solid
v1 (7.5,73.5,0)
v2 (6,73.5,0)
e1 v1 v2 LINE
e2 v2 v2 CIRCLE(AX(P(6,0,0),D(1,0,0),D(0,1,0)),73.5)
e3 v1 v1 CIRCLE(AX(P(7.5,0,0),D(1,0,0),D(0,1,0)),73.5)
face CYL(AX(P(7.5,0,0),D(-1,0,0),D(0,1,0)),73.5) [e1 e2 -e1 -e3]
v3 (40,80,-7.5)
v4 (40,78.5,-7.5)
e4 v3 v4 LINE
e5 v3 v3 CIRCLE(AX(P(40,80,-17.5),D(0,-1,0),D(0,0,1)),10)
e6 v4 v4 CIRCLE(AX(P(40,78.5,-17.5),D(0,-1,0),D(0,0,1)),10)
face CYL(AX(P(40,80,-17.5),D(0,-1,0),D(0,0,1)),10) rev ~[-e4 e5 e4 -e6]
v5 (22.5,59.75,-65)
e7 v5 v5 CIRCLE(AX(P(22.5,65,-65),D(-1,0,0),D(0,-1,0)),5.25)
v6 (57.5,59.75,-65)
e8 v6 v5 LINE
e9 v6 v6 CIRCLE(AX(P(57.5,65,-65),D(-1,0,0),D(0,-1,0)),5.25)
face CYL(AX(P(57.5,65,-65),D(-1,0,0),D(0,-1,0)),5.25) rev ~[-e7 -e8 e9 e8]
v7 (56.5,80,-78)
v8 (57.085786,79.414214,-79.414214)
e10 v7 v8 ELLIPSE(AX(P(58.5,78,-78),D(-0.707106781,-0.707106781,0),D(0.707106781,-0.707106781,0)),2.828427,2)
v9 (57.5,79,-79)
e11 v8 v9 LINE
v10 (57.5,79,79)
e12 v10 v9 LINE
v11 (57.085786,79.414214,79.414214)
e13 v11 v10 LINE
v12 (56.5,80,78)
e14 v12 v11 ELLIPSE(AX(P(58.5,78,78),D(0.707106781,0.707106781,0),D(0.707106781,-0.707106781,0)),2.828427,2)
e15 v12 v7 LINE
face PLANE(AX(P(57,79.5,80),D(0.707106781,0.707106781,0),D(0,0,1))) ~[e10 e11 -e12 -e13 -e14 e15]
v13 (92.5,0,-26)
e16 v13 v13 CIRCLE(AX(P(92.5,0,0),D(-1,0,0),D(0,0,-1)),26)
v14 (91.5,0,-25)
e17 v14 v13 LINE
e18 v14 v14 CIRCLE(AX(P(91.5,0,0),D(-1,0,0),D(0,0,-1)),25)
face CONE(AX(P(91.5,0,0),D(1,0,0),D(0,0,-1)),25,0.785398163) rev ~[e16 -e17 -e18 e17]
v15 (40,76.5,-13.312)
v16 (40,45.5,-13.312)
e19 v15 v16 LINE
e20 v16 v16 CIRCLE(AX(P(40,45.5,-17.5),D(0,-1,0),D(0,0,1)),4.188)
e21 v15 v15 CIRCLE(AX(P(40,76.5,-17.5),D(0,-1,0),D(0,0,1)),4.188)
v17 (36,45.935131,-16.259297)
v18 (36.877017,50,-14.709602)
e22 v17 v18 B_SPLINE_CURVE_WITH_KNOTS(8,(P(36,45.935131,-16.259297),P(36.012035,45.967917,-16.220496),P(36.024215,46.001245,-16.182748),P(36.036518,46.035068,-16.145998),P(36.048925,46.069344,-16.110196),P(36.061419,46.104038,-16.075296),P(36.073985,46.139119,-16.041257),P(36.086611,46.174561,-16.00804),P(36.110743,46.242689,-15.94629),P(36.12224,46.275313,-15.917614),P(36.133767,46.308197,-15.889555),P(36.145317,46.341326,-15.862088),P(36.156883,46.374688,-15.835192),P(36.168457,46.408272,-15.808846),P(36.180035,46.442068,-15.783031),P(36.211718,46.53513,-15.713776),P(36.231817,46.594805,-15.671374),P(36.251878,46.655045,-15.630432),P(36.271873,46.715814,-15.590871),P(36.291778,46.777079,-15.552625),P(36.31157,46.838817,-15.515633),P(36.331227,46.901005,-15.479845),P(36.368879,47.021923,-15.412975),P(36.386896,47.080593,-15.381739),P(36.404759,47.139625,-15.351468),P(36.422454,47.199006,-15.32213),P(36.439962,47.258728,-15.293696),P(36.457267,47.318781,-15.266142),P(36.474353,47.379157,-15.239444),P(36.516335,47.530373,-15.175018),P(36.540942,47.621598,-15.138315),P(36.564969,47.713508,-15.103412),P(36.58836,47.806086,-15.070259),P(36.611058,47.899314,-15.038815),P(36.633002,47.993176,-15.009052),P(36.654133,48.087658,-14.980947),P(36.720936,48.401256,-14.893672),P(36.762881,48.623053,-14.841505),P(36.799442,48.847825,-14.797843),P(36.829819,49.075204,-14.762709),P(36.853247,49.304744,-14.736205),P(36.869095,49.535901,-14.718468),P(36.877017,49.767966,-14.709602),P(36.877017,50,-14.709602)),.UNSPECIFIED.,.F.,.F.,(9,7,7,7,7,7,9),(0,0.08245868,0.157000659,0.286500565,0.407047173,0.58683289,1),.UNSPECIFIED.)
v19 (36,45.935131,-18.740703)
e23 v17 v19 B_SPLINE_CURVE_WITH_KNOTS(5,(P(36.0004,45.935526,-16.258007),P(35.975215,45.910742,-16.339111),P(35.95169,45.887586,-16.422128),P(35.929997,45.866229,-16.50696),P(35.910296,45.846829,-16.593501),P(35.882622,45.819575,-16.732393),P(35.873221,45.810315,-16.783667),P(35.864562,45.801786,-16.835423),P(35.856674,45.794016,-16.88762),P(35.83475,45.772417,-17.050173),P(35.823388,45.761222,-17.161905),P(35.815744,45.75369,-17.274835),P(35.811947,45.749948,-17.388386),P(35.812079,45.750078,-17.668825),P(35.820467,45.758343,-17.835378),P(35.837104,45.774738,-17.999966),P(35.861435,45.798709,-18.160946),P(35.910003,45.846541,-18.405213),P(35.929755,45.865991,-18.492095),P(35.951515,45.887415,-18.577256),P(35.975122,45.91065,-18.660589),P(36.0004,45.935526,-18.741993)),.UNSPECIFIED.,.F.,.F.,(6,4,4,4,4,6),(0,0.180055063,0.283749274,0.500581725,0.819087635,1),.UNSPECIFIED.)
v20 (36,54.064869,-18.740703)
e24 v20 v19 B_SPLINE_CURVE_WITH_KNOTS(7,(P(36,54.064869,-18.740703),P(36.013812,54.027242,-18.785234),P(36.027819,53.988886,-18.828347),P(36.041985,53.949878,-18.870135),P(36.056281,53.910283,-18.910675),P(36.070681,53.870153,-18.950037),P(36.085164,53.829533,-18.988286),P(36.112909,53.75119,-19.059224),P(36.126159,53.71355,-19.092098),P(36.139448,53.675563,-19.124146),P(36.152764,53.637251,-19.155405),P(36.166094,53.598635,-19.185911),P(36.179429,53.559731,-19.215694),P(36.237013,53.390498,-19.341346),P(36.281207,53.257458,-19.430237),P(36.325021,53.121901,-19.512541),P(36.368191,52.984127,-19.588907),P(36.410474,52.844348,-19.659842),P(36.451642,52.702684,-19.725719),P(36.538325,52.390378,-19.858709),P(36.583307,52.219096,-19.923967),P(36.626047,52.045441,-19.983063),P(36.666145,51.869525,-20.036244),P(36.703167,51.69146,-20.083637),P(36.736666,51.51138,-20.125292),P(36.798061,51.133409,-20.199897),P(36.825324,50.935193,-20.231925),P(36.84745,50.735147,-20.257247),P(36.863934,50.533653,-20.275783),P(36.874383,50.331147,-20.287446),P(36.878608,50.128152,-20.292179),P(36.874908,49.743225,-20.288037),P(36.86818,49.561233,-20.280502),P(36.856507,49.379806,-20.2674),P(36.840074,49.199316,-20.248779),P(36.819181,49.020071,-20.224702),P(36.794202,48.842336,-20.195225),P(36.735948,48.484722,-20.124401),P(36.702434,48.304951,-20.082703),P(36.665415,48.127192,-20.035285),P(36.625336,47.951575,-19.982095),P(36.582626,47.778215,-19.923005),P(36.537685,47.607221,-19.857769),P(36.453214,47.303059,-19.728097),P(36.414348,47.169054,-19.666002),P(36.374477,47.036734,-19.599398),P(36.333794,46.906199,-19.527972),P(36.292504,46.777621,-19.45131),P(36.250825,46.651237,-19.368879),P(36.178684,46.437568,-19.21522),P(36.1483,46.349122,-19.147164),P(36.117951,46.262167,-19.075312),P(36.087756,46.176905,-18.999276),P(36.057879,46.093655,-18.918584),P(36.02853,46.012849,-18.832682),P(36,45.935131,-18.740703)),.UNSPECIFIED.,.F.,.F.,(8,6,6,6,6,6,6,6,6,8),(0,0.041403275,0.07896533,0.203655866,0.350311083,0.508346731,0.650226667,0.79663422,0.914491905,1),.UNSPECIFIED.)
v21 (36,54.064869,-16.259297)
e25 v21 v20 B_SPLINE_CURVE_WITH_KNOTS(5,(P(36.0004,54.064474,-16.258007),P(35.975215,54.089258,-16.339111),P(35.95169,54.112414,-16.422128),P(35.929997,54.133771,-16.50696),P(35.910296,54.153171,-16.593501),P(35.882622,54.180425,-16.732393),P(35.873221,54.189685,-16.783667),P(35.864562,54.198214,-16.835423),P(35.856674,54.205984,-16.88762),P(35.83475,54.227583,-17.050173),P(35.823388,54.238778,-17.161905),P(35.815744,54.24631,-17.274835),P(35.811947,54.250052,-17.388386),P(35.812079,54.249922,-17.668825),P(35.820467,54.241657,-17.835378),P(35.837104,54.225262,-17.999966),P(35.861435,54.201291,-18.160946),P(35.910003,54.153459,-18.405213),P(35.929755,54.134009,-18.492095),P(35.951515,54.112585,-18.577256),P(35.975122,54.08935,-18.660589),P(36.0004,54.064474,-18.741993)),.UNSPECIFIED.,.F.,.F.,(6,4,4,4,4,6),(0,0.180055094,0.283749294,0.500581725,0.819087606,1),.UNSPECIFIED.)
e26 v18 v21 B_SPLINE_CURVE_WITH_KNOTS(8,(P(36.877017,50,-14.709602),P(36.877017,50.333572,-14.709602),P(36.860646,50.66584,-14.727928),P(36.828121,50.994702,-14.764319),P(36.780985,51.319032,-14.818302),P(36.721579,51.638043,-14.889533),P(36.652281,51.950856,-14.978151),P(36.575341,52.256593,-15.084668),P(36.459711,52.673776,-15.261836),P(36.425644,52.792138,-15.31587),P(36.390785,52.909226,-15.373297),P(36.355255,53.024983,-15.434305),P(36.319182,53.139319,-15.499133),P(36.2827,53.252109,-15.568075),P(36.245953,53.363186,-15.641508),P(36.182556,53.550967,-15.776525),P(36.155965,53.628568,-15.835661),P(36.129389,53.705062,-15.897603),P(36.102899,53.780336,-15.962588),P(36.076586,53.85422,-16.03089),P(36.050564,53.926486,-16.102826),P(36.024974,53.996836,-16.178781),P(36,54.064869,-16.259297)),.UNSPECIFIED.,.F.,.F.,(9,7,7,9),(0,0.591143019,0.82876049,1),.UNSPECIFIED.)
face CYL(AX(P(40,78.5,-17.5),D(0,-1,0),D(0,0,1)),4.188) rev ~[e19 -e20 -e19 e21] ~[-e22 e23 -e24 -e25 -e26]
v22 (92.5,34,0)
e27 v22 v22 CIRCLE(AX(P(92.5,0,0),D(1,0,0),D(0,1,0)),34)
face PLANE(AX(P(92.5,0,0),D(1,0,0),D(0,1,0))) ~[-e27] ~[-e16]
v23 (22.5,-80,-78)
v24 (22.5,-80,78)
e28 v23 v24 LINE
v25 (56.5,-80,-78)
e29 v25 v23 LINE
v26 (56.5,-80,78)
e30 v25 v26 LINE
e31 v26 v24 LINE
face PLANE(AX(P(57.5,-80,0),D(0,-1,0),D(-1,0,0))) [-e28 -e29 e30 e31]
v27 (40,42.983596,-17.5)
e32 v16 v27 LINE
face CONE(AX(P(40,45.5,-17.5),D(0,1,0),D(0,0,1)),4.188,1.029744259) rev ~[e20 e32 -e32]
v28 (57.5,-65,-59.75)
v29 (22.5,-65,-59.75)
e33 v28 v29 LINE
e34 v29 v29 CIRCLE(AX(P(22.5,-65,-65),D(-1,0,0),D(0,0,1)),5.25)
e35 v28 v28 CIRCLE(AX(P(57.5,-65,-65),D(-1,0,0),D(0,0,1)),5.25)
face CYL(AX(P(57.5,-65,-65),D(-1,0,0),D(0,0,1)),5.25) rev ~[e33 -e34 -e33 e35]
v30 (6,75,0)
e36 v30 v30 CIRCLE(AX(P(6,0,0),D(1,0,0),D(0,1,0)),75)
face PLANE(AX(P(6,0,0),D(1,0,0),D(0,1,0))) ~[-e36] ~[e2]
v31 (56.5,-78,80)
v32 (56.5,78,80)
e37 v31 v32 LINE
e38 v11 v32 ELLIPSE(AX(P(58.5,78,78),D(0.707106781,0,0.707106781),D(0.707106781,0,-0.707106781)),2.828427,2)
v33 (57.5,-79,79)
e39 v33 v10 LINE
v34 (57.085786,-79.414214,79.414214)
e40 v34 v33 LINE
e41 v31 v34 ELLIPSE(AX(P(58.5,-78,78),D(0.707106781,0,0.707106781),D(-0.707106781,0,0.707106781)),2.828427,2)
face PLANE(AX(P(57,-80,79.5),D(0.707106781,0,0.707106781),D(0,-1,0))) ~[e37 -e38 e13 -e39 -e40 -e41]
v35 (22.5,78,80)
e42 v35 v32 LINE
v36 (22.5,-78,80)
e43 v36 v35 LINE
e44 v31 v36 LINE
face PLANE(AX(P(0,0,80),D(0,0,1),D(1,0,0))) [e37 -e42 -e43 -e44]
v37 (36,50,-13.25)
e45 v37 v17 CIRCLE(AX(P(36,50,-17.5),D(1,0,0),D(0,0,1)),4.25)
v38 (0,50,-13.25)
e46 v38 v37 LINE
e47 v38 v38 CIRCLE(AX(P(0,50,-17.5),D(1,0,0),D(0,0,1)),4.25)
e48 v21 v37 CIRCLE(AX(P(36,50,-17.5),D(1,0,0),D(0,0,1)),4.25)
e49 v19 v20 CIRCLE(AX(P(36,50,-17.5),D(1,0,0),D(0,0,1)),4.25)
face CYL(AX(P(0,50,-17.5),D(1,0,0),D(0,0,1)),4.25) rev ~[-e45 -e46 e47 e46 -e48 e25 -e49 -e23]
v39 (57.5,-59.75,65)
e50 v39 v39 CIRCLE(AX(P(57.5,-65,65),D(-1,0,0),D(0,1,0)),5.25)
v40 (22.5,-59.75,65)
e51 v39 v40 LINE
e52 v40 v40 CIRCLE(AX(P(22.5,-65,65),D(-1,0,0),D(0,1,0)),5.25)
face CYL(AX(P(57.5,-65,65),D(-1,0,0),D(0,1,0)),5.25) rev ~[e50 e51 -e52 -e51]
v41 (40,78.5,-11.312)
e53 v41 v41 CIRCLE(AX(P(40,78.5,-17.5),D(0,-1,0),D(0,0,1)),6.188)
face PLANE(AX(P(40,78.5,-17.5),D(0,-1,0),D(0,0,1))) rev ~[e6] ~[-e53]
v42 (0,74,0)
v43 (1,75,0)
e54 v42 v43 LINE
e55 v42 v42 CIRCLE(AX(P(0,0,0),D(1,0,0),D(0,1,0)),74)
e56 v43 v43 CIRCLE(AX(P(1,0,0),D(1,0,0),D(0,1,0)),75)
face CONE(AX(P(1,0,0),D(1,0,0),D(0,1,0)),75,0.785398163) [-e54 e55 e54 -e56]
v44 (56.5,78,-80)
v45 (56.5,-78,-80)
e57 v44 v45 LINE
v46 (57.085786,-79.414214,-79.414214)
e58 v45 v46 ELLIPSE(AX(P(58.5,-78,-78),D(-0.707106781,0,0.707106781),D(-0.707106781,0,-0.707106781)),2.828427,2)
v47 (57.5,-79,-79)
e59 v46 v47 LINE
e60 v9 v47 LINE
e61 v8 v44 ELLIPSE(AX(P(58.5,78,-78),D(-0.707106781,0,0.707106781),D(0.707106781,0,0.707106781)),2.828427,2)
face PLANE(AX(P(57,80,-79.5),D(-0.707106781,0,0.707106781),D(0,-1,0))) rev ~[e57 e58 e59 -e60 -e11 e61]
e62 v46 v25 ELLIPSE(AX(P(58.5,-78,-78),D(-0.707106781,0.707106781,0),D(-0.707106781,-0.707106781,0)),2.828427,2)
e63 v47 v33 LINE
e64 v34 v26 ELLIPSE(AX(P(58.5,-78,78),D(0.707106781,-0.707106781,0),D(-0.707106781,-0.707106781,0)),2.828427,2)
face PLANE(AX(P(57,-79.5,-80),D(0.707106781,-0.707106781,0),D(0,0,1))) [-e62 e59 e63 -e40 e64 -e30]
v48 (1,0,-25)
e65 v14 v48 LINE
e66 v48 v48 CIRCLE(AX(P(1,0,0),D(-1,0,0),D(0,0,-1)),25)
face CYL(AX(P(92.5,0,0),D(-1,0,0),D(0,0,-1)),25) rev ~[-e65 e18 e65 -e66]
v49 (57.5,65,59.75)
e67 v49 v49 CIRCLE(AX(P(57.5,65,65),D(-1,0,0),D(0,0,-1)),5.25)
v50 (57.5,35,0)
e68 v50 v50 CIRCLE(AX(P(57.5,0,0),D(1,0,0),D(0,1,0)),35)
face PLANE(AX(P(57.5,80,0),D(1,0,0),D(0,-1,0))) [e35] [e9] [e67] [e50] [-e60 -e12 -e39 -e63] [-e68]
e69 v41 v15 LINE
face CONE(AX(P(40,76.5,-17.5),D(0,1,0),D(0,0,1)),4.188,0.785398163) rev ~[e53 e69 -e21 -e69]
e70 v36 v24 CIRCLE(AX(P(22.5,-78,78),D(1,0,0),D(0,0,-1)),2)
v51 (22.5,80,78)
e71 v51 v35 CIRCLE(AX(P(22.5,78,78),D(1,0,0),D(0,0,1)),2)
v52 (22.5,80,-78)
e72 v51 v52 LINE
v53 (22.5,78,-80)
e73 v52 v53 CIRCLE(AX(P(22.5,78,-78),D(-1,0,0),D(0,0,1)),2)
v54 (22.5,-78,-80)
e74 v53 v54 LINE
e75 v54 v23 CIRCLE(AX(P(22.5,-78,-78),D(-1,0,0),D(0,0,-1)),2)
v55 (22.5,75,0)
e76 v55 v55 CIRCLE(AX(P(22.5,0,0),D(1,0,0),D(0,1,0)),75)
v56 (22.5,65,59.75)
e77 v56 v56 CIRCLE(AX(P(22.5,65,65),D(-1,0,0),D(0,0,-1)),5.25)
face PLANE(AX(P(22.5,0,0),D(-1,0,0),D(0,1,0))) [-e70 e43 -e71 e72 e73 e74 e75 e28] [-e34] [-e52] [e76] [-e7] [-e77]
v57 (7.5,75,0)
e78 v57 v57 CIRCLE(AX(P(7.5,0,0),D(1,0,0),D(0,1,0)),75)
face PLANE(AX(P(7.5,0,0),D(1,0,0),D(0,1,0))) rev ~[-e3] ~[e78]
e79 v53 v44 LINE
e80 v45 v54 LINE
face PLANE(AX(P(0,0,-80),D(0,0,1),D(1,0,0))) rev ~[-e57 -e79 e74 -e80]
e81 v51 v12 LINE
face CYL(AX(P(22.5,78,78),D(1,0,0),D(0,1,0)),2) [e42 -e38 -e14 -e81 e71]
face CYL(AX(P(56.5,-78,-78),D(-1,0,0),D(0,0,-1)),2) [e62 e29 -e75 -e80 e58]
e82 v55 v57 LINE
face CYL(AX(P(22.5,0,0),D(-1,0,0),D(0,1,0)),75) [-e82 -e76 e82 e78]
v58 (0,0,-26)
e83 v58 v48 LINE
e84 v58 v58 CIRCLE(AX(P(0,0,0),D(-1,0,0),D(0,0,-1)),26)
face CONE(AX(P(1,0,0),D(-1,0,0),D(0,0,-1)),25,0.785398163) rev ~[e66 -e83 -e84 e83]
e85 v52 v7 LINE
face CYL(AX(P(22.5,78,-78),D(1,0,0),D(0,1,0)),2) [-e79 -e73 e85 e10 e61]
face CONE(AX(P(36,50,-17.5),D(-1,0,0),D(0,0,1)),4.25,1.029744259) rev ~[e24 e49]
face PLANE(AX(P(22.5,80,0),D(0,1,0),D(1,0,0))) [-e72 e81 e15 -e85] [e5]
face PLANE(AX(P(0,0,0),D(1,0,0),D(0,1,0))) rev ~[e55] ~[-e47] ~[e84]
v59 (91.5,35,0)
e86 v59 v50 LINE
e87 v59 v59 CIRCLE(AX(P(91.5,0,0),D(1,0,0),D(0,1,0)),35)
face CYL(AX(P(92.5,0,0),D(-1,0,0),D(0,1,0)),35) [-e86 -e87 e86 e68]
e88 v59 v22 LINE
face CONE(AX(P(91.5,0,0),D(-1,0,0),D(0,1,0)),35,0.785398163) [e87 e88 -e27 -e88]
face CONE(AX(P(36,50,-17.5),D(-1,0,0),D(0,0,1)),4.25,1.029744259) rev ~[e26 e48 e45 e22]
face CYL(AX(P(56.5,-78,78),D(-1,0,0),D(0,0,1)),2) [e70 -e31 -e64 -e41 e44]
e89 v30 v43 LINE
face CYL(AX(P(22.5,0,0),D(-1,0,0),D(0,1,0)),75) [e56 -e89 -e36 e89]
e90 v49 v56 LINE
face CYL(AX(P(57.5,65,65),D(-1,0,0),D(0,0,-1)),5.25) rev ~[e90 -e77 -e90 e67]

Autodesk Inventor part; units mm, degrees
ref_plane "YZ Plane" through (0, 0, 0) normal (1, 0, 0) x (0, 1, 0)
ref_plane "XZ Plane" through (0, 0, 0) normal (0, 1, 0) x (-1, 0, 0)
ref_plane "XY Plane" through (0, 0, 0) normal (0, 0, 1) x (1, 0, 0)
sketch "Skizze1" plane through (0, 0, 0) normal (0, 0, 1) x (1, 0, 0)
  line L0 (0, 0) -> (22.5, 0)
  line L1 (22.5, 0) -> (22.5, 75)
  line L2 (22.5, 75) -> (0, 75)
  line L3 (0, 75) -> (0, 0)
  line L4 (22.5, 80) -> (57.5, 80)
  line L5 (57.5, 80) -> (57.5, -80)
  line L6 (57.5, -80) -> (22.5, -80)
  line L7 (22.5, -80) -> (22.5, 80)
  line L8 (57.5, 0) -> (92.5, 0)
  line L9 (92.5, 0) -> (92.5, 35)
  line L10 (92.5, 35) -> (57.5, 35)
  line L11 (57.5, 35) -> (57.5, 0)
  line L12 (6, 75) -> (7.5, 75)
  line L13 (7.5, 75) -> (7.5, 73.5)
  line L14 (7.5, 73.5) -> (6, 73.5)
  line L15 (6, 73.5) -> (6, 75)
  dimension "d9" = 160
  dimension "d10" = 70
  dimension "d11" = 150
  dimension "d12" = 22.5
  dimension "d13" = 35
  dimension "d14" = 92.5
  dimension "d15" = 6
  dimension "d16" = 1.5
  dimension "d17" = 147
revolve "Umdrehung1" add sketch "Skizze1" angle 360 about axis through (0, 0, 0) along (1, 0, 0) contours L3 L2 L15 L14 L13 L1 L0 | L5 L10 L9 L8
extrude "Extrusion1" add sketch "Skizze1" along normal mid plane 160 contours L1 L7 L4 L5 L6
sketch "Skizze2" plane through (92.5, 0, 0) normal (1, 0, 0) x (0, 0, -1)
  circle A0 centre (0, 0) radius 35 projected
hole "Bohrung1" at (92.5, 0, 0) direction (-1, 0, 0) diameter 50 end through all
sketch "Skizze3" plane through (57.5, -80, 80) normal (1, 0, 0) x (0, 0, -1)
  line L0 (0, 160) -> (160, 160) projected
  line L1 (0, 160) -> (30, 160)
  line L2 (30, 160) -> (30, 130)
  line L3 (30, 130) -> (0, 130)
  line L4 (0, 130) -> (0, 160)
  line L5 (145, 15) -> (15, 15)
  line L6 (15, 15) -> (15, 145)
  line L7 (15, 145) -> (145, 145)
  line L8 (145, 145) -> (145, 15)
  line L9 (145, 15) -> (15, 145) construction
  line L10 (15, 15) -> (145, 145) construction
  point P0 (80, 80)
  dimension "d28" = 30
  dimension "d29" = 30
  dimension "d30" = 130
  dimension "d31" = 130
hole "Bohrung2" at (57.5, 65, 65) direction (-1, 0, 0) diameter 10.5 end through all
pattern_circular "Runde Anordnung1" count 4 over 360 about axis through (75, 0, 0) along (1, 0, 0) of "Bohrung2"
sketch "Skizze5" plane through (0, 0, 0) normal (-1, 0, 0) x (0, 0, 1)
  line L0 (80, 80) -> (-80, 80) projected
  line L1 (-80, 80) -> (-80, -80) projected
  point P0 (0, 0)
  point P1 (-17.5, 50)
  point P2 (-80, 50)
  point P3 (-80, -50)
  dimension "d54" = 30
  dimension "d55" = 62.5
hole "Bohrung3" at (0, 50, -17.5) direction (1, 0, 0) diameter 8.5 depth 36 tip angle 118
sketch "Skizze6" plane through (22.5, 80, 80) normal (0, 1, 0) x (1, 0, 0)
  line L0 (35, 160) -> (35, 0) projected
  line L1 (5, 160) -> (35, 160) projected
  point P0 (-22.5, 80)
  point P1 (17.5, 97.5)
  point P2 (35, 130)
  point P3 (35, 30)
  dimension "d63" = 17.5
  dimension "d64" = 62.5
hole "Bohrung4" at (40, 80, -17.5) direction (0, -1, 0) diameter 8.376 depth 34.5 tip angle 118 counterbore diameter 20 counterbore depth 1.5 thread size "M10x1.5" class "6H" standard "ISO Metric profile"
chamfer "Fase1" distance 2 angle 45 1 edges at (40, 78.5, -21.688)
chamfer "Fase2" distance 1 angle 45 8 edges at (0, -75, 0) (0, 0, 25) (92.5, 0, 25) (92.5, -35, 0) (57.5, 0, 80) (57.5, 80, 0) (57.5, 0, -80) (57.5, -80, 0)
fillet "Rundung2" radius 2 4 edges at (39.5, 80, -80) (39.5, 80, 80) (39.5, -80, -80) (39.5, -80, 80)
equation "\"d19\" = d9"
properties part number "Deckel_vorne" material "Stahl AISI 4130"
